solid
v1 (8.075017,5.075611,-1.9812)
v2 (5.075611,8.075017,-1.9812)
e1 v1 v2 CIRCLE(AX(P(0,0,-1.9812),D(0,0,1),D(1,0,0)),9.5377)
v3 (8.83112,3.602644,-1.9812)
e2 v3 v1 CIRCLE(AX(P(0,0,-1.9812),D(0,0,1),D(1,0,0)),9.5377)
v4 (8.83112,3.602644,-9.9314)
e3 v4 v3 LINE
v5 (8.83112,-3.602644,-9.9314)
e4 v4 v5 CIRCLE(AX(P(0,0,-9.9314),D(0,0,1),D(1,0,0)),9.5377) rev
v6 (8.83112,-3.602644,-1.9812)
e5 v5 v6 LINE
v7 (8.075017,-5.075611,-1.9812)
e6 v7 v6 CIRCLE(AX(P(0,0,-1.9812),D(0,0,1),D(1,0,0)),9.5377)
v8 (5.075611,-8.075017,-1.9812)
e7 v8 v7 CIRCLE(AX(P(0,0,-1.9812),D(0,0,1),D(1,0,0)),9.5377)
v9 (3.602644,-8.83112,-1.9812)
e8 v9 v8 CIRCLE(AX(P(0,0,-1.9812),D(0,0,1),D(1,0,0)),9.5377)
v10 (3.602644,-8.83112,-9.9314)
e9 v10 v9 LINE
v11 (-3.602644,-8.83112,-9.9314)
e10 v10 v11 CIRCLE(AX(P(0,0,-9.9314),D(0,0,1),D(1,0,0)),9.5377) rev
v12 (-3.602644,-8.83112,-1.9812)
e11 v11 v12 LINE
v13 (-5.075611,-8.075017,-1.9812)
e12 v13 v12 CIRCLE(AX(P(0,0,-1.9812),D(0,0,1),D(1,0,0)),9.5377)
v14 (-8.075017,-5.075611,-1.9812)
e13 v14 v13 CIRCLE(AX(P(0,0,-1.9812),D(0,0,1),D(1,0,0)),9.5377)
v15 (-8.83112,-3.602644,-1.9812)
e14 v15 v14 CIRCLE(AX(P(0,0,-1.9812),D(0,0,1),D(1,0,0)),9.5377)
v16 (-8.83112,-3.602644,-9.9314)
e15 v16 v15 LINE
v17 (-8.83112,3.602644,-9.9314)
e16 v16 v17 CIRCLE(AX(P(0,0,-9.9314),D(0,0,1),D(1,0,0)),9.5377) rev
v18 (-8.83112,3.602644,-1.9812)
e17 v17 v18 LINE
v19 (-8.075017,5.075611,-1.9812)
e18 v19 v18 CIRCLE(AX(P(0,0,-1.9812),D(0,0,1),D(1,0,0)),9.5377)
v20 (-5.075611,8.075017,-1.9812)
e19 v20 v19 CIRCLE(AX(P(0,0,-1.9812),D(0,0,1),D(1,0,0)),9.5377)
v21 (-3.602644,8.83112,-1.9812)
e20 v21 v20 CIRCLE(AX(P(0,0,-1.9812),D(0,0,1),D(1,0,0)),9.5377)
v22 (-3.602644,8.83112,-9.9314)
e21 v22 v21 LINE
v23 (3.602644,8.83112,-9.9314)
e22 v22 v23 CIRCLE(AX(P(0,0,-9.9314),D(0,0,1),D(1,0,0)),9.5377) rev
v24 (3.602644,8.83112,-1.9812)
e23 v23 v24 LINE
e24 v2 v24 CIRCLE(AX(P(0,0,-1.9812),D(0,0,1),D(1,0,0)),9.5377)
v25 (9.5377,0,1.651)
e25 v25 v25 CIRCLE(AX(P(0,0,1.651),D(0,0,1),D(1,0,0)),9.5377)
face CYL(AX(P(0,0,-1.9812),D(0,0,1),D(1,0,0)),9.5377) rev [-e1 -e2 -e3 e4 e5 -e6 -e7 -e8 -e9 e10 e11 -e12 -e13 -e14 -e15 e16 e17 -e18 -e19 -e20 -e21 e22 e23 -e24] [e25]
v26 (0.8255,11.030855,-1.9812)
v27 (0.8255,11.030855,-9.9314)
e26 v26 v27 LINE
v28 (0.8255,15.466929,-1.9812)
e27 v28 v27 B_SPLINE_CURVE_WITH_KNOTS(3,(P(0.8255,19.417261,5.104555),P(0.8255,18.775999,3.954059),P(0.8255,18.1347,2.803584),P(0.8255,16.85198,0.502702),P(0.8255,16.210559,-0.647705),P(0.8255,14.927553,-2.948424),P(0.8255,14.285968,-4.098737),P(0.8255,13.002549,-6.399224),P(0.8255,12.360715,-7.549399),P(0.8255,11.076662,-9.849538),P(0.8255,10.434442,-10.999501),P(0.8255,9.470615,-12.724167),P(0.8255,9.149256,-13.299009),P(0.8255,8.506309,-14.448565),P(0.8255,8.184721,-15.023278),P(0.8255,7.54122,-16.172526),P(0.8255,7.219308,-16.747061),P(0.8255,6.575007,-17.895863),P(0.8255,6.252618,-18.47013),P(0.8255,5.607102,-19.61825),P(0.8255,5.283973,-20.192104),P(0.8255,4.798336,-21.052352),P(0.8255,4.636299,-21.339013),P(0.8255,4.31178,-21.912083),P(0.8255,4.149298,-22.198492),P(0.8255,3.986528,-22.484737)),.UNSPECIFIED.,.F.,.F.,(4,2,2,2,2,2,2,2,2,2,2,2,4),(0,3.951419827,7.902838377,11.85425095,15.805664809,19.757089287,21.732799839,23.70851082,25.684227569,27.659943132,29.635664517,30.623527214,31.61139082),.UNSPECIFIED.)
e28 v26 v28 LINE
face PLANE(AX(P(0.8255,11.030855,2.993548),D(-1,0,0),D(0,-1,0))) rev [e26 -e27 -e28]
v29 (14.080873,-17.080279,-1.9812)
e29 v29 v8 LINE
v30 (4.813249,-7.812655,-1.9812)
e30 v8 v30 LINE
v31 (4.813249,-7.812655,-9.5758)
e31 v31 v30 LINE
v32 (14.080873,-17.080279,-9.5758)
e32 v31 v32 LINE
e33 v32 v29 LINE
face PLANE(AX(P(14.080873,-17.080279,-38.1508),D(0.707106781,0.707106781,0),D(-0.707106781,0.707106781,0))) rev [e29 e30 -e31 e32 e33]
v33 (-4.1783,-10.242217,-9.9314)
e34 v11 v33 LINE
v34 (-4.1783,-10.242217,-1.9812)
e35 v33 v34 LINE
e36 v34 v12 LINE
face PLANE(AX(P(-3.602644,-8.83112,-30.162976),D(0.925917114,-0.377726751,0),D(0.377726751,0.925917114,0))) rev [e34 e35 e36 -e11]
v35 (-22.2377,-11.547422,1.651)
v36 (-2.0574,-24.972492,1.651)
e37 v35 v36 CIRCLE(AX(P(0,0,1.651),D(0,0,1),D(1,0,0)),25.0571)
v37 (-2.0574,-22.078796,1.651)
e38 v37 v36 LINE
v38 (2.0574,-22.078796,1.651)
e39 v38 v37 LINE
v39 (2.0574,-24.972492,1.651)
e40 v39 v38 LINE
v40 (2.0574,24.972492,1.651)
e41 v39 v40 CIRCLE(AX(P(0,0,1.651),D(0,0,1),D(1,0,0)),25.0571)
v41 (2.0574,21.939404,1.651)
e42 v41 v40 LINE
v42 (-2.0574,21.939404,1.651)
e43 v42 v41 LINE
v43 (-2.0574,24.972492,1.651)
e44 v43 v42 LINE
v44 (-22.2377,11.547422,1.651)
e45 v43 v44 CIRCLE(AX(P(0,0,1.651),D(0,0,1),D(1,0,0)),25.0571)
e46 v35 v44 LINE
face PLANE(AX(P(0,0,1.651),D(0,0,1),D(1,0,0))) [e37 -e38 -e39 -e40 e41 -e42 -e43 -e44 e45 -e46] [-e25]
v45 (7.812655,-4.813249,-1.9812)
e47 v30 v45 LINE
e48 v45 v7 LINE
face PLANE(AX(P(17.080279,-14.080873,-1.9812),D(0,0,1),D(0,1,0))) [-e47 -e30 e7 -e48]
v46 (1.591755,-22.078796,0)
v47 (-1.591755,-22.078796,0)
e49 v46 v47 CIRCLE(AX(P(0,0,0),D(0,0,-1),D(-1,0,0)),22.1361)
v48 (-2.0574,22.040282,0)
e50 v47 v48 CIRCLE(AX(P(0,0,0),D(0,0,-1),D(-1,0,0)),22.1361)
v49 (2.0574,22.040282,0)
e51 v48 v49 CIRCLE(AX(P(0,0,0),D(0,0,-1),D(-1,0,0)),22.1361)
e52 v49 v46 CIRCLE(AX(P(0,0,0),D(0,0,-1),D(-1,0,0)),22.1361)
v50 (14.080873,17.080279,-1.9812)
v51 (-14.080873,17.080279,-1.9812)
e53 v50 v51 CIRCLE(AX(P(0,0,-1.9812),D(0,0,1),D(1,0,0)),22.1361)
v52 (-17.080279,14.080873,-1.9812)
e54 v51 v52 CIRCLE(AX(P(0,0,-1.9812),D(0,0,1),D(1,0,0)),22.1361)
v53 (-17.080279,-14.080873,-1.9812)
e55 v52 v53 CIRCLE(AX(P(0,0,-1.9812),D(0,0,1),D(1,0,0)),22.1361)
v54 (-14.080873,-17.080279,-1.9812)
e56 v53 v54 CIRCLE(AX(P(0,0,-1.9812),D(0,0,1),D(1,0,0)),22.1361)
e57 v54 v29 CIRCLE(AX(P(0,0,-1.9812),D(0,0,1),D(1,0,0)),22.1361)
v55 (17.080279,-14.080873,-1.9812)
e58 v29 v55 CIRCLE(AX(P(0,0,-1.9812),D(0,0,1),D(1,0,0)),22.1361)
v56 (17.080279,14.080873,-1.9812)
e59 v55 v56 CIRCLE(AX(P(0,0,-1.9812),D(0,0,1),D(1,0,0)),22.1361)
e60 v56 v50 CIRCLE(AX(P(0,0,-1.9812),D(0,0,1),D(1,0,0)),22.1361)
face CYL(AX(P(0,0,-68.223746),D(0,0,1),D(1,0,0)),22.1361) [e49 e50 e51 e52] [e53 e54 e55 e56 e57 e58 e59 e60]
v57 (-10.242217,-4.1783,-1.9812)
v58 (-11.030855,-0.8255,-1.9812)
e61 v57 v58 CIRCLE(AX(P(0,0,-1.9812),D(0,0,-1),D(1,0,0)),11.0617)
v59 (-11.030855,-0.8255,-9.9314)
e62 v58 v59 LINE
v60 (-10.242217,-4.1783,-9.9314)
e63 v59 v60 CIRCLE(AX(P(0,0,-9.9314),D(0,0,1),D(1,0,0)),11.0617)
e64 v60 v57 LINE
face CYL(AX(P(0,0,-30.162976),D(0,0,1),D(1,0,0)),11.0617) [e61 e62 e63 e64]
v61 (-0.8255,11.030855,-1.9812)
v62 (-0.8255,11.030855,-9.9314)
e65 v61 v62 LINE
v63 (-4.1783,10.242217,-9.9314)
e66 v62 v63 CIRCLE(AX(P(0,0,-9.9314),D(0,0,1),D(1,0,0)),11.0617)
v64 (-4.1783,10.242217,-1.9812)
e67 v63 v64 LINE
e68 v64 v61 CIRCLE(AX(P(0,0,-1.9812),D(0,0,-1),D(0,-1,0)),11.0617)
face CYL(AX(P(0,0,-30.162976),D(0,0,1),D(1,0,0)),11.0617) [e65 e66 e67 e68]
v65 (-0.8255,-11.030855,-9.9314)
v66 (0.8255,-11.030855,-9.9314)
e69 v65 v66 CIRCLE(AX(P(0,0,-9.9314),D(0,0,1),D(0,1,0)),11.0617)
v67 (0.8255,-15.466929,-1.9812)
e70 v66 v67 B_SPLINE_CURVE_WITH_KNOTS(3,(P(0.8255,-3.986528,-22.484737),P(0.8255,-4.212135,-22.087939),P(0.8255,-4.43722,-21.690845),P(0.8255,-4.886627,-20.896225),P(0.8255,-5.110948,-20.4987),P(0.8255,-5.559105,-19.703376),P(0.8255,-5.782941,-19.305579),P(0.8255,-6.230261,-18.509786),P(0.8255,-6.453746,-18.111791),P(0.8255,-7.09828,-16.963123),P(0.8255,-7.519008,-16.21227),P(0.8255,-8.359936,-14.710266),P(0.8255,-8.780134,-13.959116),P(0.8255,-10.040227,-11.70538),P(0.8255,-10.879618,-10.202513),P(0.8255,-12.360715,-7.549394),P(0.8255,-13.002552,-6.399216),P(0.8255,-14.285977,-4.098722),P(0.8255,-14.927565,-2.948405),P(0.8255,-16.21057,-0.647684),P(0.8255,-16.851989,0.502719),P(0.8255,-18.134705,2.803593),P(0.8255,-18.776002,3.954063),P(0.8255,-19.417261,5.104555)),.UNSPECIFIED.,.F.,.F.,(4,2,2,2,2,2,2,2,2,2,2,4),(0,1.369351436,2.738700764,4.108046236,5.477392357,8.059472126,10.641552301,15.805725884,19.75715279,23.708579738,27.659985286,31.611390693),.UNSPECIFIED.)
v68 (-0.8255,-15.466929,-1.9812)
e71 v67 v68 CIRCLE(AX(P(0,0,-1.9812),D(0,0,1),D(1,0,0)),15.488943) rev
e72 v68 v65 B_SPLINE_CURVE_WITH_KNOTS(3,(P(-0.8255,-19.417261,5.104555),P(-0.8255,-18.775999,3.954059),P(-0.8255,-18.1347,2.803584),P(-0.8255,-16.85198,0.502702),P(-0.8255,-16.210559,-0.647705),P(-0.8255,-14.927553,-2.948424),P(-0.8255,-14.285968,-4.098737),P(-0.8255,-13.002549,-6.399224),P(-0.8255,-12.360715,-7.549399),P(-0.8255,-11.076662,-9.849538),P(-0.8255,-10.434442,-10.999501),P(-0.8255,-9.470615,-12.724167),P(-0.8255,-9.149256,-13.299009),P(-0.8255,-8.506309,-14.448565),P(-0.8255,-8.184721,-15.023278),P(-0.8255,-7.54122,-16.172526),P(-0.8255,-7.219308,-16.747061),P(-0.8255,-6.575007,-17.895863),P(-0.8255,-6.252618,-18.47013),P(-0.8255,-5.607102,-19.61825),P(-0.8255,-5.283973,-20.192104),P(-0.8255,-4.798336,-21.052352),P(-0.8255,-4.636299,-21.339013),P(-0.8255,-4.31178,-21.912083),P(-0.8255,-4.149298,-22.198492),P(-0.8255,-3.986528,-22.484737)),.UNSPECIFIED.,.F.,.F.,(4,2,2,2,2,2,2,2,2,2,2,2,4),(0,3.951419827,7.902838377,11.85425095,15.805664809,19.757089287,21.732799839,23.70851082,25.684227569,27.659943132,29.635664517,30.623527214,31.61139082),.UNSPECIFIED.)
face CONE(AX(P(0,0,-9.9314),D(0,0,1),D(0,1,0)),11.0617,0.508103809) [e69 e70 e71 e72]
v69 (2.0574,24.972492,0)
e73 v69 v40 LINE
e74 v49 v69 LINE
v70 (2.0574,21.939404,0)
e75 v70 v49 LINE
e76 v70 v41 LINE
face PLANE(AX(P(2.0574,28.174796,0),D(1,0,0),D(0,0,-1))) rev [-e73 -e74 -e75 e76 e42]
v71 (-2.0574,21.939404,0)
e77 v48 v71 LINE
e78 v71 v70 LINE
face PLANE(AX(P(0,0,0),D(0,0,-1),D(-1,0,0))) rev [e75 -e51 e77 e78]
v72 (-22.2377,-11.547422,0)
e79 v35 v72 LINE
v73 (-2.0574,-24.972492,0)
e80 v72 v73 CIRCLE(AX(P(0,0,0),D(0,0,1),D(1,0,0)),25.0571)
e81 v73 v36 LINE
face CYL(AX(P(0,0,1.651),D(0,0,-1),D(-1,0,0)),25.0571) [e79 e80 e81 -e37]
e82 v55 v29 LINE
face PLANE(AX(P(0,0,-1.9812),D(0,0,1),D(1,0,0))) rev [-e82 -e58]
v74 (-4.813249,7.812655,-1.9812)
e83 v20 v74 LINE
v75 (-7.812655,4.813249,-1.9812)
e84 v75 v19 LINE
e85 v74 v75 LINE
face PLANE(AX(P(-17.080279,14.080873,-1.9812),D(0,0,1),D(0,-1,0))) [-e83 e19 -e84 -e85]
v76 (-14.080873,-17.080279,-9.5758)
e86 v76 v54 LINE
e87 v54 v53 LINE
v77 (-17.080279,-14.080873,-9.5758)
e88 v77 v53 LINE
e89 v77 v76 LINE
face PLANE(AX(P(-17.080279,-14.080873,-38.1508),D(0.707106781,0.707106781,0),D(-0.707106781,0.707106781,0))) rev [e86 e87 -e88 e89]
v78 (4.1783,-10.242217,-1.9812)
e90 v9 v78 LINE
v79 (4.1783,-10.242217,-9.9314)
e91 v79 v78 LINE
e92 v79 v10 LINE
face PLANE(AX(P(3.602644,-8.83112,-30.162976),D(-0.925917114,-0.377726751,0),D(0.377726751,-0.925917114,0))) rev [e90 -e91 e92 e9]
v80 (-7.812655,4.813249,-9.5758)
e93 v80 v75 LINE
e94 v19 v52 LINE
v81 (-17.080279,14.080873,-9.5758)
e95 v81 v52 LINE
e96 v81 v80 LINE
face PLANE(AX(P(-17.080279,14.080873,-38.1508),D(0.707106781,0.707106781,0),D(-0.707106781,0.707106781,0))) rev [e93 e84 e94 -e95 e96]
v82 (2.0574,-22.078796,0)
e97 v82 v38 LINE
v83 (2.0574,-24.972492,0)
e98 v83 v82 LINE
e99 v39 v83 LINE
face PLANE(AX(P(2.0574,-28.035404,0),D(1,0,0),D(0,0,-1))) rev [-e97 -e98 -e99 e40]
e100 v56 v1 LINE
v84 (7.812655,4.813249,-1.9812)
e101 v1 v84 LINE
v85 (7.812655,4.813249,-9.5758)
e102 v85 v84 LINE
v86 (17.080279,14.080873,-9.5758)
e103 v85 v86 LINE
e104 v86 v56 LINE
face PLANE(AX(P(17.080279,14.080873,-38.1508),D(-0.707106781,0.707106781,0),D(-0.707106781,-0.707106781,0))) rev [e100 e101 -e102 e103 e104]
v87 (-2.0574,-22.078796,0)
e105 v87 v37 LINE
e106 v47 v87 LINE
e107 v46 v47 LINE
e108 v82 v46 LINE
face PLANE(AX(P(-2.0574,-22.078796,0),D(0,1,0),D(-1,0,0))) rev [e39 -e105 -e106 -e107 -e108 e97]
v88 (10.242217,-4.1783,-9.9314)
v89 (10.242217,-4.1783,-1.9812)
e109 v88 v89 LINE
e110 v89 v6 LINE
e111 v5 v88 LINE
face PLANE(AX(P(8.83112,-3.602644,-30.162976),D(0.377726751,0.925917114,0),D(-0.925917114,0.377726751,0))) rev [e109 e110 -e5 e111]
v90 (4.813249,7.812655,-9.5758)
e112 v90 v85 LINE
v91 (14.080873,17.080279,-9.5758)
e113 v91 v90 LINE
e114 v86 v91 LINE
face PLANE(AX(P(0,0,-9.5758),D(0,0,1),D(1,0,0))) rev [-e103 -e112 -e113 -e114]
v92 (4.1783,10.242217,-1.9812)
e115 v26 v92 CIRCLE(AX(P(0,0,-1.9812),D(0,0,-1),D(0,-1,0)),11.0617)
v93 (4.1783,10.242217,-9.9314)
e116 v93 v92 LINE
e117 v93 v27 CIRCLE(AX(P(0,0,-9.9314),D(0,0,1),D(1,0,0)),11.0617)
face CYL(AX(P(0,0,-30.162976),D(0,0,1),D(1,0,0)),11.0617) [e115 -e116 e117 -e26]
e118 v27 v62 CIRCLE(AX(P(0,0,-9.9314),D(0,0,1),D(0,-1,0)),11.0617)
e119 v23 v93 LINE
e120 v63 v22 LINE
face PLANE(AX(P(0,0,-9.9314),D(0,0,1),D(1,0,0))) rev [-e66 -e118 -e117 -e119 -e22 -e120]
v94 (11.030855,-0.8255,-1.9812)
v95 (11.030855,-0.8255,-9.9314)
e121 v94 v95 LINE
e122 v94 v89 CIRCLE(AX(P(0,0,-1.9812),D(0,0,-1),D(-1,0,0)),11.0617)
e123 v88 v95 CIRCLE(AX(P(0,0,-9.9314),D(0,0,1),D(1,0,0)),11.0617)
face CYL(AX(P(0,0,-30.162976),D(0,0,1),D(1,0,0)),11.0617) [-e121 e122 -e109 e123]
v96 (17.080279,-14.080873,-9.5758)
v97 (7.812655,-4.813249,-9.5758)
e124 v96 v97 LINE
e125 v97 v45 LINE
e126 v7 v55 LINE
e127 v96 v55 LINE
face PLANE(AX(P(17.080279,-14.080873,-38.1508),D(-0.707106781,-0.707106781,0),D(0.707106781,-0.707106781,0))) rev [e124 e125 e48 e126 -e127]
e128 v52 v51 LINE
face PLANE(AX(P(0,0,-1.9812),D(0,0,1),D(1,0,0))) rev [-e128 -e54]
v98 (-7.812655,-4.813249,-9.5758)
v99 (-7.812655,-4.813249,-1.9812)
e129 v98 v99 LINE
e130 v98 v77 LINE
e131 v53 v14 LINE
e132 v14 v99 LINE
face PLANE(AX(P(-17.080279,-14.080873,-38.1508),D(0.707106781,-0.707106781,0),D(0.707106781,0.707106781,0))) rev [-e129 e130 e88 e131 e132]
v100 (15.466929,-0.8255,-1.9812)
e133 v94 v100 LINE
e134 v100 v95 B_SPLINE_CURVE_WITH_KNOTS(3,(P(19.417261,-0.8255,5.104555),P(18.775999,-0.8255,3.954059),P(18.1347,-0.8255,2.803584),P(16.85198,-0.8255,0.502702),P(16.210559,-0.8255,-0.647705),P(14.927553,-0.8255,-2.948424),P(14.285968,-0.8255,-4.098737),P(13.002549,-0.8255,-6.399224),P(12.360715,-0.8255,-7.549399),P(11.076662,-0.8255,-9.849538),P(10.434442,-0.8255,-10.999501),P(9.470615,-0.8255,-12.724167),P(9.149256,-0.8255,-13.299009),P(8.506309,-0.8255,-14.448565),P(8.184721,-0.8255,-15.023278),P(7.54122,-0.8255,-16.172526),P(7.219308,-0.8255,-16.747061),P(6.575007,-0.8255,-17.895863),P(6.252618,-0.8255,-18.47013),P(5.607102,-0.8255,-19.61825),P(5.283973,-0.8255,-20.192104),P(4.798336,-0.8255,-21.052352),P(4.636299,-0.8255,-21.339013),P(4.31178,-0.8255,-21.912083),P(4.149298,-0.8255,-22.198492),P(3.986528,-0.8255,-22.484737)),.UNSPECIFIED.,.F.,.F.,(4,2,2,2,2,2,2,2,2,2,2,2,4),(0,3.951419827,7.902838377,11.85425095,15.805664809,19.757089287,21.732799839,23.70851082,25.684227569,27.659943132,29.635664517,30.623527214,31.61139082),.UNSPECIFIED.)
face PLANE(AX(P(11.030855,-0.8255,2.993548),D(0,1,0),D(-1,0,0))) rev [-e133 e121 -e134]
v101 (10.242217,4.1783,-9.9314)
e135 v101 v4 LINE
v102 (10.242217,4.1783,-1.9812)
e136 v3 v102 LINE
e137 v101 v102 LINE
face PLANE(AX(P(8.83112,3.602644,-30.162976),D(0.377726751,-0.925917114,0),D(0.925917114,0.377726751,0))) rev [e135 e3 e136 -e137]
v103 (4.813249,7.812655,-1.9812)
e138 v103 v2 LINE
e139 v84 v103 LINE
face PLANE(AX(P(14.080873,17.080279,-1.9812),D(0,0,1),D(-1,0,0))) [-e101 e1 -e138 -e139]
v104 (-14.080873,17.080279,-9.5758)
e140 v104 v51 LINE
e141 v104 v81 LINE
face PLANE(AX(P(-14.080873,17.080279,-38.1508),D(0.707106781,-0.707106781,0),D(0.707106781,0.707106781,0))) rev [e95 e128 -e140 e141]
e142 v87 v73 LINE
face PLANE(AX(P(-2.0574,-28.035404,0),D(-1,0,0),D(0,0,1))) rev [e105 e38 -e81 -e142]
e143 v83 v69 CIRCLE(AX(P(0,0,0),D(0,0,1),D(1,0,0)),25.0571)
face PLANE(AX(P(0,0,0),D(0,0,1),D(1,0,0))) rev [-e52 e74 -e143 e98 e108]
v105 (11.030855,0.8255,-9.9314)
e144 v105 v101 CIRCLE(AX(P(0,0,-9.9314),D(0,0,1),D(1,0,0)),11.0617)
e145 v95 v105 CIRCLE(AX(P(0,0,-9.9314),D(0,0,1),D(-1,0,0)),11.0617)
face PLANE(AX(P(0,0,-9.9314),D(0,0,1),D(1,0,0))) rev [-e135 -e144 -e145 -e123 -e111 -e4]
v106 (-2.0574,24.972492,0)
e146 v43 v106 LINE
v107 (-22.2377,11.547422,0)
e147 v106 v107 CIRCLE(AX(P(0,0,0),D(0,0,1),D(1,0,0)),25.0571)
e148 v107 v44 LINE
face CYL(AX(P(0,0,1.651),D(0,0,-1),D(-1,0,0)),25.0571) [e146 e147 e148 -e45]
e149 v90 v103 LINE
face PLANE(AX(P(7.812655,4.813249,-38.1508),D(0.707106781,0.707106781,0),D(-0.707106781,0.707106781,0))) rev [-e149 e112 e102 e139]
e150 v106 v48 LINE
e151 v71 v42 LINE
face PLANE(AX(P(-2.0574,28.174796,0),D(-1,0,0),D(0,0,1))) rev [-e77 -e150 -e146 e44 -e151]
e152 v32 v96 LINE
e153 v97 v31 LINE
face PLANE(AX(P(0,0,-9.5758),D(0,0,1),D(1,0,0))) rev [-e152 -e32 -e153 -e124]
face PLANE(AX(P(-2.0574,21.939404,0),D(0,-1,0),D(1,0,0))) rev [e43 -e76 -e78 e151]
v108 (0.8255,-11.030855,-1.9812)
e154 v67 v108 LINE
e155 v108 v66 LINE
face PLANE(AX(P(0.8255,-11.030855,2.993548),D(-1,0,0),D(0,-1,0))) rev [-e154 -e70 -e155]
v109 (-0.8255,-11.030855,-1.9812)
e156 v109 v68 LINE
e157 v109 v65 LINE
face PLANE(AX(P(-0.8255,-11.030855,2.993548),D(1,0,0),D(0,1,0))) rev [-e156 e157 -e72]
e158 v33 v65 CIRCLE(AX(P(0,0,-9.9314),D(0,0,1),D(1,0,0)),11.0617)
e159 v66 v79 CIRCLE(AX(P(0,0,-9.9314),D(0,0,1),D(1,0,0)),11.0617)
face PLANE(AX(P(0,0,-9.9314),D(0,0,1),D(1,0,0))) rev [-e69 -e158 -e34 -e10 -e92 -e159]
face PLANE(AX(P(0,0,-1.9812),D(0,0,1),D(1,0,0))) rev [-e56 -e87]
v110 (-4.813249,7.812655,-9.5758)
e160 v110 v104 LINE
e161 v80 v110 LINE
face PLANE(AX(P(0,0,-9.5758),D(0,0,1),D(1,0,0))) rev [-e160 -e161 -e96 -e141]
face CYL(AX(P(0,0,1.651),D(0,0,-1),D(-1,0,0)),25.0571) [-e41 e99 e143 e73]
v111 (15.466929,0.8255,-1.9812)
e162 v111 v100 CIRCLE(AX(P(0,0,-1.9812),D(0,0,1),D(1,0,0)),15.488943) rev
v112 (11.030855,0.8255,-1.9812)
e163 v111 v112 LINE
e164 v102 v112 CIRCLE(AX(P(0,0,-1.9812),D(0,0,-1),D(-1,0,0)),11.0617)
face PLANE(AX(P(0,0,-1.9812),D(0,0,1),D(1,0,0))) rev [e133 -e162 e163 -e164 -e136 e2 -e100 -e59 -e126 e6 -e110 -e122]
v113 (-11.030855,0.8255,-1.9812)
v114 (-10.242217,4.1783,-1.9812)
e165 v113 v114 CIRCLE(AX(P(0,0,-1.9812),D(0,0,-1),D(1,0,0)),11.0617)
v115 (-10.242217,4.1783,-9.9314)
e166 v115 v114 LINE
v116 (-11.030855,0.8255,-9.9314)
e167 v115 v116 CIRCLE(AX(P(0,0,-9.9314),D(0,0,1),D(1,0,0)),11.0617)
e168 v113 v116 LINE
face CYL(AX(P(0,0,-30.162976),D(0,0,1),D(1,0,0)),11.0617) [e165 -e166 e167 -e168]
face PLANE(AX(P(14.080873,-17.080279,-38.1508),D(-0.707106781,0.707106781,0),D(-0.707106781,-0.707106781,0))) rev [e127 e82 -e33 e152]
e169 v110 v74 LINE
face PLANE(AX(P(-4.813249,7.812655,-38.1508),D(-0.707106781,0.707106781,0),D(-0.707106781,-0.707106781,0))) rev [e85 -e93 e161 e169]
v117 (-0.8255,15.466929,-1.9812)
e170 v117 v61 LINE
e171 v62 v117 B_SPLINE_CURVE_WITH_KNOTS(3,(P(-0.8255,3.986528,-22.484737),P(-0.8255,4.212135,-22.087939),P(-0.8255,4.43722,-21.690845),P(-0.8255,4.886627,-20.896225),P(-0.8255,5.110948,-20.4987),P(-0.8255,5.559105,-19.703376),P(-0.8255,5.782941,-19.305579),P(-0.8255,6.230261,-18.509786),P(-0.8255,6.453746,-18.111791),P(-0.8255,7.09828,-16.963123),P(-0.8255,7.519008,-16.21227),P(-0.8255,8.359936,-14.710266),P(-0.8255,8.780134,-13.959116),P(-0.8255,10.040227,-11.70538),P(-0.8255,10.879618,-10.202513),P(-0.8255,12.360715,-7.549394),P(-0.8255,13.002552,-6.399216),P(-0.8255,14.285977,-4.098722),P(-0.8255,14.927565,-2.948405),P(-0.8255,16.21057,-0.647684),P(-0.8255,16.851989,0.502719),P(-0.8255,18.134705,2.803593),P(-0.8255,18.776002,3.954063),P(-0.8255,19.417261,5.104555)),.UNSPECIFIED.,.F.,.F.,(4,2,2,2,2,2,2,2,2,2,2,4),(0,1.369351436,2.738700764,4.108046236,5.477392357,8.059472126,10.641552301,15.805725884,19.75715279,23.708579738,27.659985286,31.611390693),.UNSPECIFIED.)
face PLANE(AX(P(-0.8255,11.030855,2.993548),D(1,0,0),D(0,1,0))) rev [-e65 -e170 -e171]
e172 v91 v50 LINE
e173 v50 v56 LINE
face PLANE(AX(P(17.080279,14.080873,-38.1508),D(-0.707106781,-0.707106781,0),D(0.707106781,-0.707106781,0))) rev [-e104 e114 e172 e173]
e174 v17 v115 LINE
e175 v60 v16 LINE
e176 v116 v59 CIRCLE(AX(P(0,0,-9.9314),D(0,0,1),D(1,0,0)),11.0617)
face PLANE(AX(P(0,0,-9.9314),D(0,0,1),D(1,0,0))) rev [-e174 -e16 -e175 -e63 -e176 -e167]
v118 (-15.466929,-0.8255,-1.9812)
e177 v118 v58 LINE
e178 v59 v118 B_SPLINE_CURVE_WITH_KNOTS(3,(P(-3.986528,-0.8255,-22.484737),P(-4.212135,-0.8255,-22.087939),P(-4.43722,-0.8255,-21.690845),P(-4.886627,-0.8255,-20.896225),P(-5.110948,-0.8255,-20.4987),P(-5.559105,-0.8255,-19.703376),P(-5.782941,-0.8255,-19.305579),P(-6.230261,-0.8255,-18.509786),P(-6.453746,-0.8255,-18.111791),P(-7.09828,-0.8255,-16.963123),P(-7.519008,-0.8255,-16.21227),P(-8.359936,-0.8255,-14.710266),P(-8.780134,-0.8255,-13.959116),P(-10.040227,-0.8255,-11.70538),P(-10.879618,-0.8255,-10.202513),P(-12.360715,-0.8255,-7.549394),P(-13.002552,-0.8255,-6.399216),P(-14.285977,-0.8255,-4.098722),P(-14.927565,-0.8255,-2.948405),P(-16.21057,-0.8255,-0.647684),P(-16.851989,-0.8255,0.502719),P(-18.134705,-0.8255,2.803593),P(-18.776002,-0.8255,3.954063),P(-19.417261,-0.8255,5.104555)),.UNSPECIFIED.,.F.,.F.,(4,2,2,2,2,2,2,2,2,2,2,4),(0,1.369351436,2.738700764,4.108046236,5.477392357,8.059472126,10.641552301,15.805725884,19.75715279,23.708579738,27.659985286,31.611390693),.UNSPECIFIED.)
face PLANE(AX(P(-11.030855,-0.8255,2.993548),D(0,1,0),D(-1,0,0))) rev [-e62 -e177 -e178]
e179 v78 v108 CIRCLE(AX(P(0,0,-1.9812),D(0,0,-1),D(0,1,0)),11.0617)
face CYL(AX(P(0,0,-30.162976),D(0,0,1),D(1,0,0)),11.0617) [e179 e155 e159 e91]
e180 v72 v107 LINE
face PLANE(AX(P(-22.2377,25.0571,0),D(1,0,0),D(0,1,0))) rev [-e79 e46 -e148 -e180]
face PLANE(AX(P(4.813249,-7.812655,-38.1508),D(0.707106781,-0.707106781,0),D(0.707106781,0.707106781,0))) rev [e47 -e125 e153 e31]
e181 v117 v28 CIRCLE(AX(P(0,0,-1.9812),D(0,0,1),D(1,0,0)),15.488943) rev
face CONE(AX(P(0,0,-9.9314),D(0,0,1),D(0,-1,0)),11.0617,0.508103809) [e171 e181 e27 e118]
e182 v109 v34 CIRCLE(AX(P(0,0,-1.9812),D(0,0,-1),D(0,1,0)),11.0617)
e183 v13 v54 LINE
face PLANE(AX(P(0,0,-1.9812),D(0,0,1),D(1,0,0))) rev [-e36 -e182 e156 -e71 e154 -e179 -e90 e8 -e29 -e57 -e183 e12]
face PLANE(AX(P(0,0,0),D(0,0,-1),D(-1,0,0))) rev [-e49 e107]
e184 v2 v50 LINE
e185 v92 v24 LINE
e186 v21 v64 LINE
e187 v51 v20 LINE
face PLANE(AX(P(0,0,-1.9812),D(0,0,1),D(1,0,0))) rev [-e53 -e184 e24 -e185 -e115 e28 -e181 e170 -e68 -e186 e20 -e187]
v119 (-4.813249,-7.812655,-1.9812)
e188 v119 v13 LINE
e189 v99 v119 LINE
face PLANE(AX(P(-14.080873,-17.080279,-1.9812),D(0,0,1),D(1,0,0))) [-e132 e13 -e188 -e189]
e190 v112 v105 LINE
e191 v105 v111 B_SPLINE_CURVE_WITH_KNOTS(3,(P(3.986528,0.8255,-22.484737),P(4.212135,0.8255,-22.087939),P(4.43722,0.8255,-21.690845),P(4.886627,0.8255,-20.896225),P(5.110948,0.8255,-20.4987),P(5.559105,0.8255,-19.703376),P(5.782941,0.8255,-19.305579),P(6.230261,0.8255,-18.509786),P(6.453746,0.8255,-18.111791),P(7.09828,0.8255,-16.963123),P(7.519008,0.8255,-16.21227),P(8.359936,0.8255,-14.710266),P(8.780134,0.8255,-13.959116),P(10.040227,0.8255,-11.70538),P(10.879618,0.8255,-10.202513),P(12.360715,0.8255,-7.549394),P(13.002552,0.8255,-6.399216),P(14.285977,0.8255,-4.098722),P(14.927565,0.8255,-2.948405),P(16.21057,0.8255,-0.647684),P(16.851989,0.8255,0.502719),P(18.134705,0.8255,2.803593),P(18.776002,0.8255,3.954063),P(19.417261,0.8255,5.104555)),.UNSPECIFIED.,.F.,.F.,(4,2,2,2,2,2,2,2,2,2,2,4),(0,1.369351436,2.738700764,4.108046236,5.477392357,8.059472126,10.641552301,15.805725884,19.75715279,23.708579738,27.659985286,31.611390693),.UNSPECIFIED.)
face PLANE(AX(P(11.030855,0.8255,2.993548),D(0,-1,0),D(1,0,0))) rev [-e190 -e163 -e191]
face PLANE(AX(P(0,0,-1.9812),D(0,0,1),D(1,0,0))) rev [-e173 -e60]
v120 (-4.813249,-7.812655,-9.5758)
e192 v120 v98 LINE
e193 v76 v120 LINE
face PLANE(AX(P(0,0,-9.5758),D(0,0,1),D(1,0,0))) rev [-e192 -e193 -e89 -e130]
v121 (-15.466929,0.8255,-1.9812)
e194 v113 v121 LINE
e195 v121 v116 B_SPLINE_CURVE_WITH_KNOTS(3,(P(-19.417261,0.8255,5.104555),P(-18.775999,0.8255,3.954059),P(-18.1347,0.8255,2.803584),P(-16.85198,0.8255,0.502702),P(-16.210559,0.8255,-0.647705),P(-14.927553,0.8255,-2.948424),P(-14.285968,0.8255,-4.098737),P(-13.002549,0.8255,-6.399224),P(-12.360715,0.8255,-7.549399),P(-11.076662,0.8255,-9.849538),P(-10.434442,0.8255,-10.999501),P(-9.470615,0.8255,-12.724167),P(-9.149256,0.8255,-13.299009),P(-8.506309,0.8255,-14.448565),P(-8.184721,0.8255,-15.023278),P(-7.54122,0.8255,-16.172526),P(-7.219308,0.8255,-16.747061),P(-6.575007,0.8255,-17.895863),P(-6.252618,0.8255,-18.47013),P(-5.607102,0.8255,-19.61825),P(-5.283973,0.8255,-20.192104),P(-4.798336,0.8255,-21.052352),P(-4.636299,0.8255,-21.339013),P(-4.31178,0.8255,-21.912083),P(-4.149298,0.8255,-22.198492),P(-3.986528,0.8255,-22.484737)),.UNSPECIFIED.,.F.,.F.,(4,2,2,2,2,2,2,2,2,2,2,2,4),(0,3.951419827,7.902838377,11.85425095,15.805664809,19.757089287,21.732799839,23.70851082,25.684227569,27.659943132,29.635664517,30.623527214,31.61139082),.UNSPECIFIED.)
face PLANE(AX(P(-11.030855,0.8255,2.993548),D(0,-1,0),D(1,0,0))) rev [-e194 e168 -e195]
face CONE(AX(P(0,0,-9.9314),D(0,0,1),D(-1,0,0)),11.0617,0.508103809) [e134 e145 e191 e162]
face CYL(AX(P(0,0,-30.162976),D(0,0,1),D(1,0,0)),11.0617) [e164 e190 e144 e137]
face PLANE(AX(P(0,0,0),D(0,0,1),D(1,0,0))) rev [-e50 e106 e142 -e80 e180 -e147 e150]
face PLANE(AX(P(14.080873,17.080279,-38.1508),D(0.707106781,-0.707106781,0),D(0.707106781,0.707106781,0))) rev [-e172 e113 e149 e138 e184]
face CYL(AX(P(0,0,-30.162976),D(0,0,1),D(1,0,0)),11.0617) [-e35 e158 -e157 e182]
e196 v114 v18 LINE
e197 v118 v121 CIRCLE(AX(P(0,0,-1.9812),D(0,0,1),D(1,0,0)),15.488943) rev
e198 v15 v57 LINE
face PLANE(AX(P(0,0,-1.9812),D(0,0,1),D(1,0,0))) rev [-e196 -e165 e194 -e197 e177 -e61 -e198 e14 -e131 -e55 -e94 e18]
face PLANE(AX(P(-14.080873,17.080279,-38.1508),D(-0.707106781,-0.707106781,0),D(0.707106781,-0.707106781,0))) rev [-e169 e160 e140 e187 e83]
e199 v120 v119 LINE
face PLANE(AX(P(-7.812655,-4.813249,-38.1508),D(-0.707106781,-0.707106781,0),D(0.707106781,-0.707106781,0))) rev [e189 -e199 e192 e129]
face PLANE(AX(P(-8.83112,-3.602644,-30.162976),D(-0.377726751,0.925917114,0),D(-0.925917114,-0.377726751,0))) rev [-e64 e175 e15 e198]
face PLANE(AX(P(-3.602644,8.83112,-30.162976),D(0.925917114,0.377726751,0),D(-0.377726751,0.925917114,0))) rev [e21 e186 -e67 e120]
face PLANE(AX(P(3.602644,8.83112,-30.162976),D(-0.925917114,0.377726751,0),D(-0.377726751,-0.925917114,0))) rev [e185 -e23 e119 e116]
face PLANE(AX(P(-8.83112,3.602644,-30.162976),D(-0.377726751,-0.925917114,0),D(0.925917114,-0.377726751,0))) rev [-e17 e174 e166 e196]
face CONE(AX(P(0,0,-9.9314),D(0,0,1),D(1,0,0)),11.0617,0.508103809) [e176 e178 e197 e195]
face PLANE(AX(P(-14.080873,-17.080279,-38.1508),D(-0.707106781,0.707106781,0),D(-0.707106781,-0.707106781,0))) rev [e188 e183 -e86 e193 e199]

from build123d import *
from build123d.topology import SkipClean

# Parameters (mm, degrees)
SKETCH1_R           = 25.0571
BOSS_EXTRUDE1_DEPTH = 1.651
SKETCH2_W           = 50.1142
SKETCH2_H           = 50.1142
CUT_EXTRUDE1_DEPTH  = 36.474530607
SKETCH3_W           = 4.1148
SKETCH3_H           = 6.235392346
SKETCH3_H_2         = 5.956607654
CUT_EXTRUDE2_DEPTH  = 36.474530607
SKETCH4_R           = 22.1361
BOSS_EXTRUDE2_DEPTH = 1.9812
SKETCH6_R           = 9.5377
CUT_EXTRUDE3_DEPTH  = 36.562290462
BOSS_EXTRUDE3_DEPTH = 7.5946
BOSS_EXTRUDE4_DEPTH = 7.9502
REVOLVE1_ANGLE      = 20
CUT_EXTRUDE4_START  = -7.9502
CUT_EXTRUDE4_DEPTH  = 7.9502
CIRPATTERN1_COUNT   = 4


# Read off the part's stored shape, not the designer's step: Revolve1
with BuildPart() as part:
    # Sketch1 → Boss-Extrude1 (new body)
    with BuildSketch(Plane.XY):
        with Locations(Location((0, 0, 0), (0, 0, 180))):
            Circle(SKETCH1_R)
    extrude(amount=BOSS_EXTRUDE1_DEPTH)

    # Sketch2 → Cut-Extrude1 (cut, through all)
    with BuildSketch(Plane.XY.offset(1.651)):
        with Locations((-47.2948, 0)):
            Rectangle(SKETCH2_W, SKETCH2_H)
    extrude(amount=-CUT_EXTRUDE1_DEPTH, mode=Mode.SUBTRACT)

    # Sketch3 → Cut-Extrude2 (cut, through all)
    with BuildSketch(Plane.XY.offset(1.651)):
        with Locations((0, 25.0571)):
            Rectangle(SKETCH3_W, SKETCH3_H)
        with Locations((0, -25.0571)):
            Rectangle(SKETCH3_W, SKETCH3_H_2)
    extrude(amount=-CUT_EXTRUDE2_DEPTH, mode=Mode.SUBTRACT)

    # Sketch4 → Boss-Extrude2 (add)
    with BuildSketch(Plane(origin=(0, 0, 0), x_dir=(-1, 0, 0), z_dir=(0, 0, -1))):
        with Locations(Location((0, 0, 0), (0, 0, 180))):
            Circle(SKETCH4_R)
    extrude(amount=BOSS_EXTRUDE2_DEPTH)

    # Sketch6 → Cut-Extrude3 (cut, through all)
    with BuildSketch(Plane.XY.offset(1.651)):
        Circle(SKETCH6_R)
    extrude(amount=-CUT_EXTRUDE3_DEPTH, mode=Mode.SUBTRACT)

    # Sketch5 → Boss-Extrude3 (add)
    with BuildSketch(Plane(origin=(0, 0, -1.9812), x_dir=(-1, 0, 0), z_dir=(0, 0, -1))):
        Polygon((17.080278923, -14.080873379), (7.812654606, -4.813249062), (4.813249062, -7.812654606), (14.080873379, -17.080278923), align=None)
    boss_extrude3 = extrude(amount=BOSS_EXTRUDE3_DEPTH)

    # Sketch7 → Boss-Extrude4 (add)
    with SkipClean():  # the faces are left unmerged after this step: merging them gives an invalid solid
        with BuildSketch(Plane(origin=(0, 0, -1.9812), x_dir=(-1, 0, 0), z_dir=(0, 0, -1))):
            with BuildLine():
                Line((8.831119657, 3.602644432), (10.242217338, 4.1783))
                ThreePointArc((10.242217338, 4.1783), (11.0617, 0), (10.242217338, -4.1783))
                Line((10.242217338, -4.1783), (8.831119657, -3.602644432))
                ThreePointArc((8.831119657, -3.602644432), (9.5377, 0), (8.831119657, 3.602644432))
            make_face()
        boss_extrude4 = extrude(amount=BOSS_EXTRUDE4_DEPTH)

    # Revolve1 outline → Revolve1 (revolve)
    with SkipClean():  # the faces are left unmerged after this step: merging them gives an invalid solid
        with BuildSketch(Plane(origin=(0, 0, 0), x_dir=(-0.9848077530122078, 0.17364817766693158, 0), z_dir=(0.17364817766693158, 0.9848077530122078, 0))):
            Polygon((11.0617, -1.9812), (11.0617, -9.9314), (15.48894278, -1.9812), align=None)
        revolve1 = revolve(axis=Axis((0, 0, 0), (0, 0, 1)), revolution_arc=REVOLVE1_ANGLE)

    # Sketch9 → Cut-Extrude4 (cut)
    with SkipClean():  # the faces are left unmerged after this step: merging them gives an invalid solid
        with BuildSketch(Plane(origin=(0, 0, -9.9314), x_dir=(-1, 0, 0), z_dir=(0, 0, -1)).offset(CUT_EXTRUDE4_START)):
            with BuildLine():
                Line((11.030854756, -0.8255), (15.48894278, -0.8255))
                Line((15.48894278, -0.8255), (15.48894278, -2.731118515))
                Line((15.48894278, -2.731118515), (10.893647921, -1.920844047))
                ThreePointArc((10.893647921, -1.920844047), (10.975923608, -1.374884662), (11.030854756, -0.8255))
            make_face()
            with BuildLine():
                Line((11.030854756, 0.8255), (15.48894278, 0.8255))
                Line((15.48894278, 0.8255), (15.48894278, 2.731118515))
                Line((15.48894278, 2.731118515), (10.893647921, 1.920844047))
                ThreePointArc((10.893647921, 1.920844047), (10.975923608, 1.374884662), (11.030854756, 0.8255))
            make_face()
        cut_extrude4 = extrude(amount=CUT_EXTRUDE4_DEPTH, mode=Mode.SUBTRACT)

    # CirPattern1: Boss-Extrude3, Boss-Extrude4, Revolve1, Cut-Extrude4 ×4 about axis
    with SkipClean():  # the faces are left unmerged after this step: merging them gives an invalid solid
        cirpattern1_axis = Axis((0, 0, 0), (0, 0, 1))
        add([boss_extrude3.rotate(cirpattern1_axis, i * 360 / CIRPATTERN1_COUNT) for i in range(1, CIRPATTERN1_COUNT)])
        add([boss_extrude4.rotate(cirpattern1_axis, i * 360 / CIRPATTERN1_COUNT) for i in range(1, CIRPATTERN1_COUNT)])
        add([revolve1.rotate(cirpattern1_axis, i * 360 / CIRPATTERN1_COUNT) for i in range(1, CIRPATTERN1_COUNT)])
        add([cut_extrude4.rotate(cirpattern1_axis, i * 360 / CIRPATTERN1_COUNT) for i in range(1, CIRPATTERN1_COUNT)], mode=Mode.SUBTRACT)


solid = part.part
